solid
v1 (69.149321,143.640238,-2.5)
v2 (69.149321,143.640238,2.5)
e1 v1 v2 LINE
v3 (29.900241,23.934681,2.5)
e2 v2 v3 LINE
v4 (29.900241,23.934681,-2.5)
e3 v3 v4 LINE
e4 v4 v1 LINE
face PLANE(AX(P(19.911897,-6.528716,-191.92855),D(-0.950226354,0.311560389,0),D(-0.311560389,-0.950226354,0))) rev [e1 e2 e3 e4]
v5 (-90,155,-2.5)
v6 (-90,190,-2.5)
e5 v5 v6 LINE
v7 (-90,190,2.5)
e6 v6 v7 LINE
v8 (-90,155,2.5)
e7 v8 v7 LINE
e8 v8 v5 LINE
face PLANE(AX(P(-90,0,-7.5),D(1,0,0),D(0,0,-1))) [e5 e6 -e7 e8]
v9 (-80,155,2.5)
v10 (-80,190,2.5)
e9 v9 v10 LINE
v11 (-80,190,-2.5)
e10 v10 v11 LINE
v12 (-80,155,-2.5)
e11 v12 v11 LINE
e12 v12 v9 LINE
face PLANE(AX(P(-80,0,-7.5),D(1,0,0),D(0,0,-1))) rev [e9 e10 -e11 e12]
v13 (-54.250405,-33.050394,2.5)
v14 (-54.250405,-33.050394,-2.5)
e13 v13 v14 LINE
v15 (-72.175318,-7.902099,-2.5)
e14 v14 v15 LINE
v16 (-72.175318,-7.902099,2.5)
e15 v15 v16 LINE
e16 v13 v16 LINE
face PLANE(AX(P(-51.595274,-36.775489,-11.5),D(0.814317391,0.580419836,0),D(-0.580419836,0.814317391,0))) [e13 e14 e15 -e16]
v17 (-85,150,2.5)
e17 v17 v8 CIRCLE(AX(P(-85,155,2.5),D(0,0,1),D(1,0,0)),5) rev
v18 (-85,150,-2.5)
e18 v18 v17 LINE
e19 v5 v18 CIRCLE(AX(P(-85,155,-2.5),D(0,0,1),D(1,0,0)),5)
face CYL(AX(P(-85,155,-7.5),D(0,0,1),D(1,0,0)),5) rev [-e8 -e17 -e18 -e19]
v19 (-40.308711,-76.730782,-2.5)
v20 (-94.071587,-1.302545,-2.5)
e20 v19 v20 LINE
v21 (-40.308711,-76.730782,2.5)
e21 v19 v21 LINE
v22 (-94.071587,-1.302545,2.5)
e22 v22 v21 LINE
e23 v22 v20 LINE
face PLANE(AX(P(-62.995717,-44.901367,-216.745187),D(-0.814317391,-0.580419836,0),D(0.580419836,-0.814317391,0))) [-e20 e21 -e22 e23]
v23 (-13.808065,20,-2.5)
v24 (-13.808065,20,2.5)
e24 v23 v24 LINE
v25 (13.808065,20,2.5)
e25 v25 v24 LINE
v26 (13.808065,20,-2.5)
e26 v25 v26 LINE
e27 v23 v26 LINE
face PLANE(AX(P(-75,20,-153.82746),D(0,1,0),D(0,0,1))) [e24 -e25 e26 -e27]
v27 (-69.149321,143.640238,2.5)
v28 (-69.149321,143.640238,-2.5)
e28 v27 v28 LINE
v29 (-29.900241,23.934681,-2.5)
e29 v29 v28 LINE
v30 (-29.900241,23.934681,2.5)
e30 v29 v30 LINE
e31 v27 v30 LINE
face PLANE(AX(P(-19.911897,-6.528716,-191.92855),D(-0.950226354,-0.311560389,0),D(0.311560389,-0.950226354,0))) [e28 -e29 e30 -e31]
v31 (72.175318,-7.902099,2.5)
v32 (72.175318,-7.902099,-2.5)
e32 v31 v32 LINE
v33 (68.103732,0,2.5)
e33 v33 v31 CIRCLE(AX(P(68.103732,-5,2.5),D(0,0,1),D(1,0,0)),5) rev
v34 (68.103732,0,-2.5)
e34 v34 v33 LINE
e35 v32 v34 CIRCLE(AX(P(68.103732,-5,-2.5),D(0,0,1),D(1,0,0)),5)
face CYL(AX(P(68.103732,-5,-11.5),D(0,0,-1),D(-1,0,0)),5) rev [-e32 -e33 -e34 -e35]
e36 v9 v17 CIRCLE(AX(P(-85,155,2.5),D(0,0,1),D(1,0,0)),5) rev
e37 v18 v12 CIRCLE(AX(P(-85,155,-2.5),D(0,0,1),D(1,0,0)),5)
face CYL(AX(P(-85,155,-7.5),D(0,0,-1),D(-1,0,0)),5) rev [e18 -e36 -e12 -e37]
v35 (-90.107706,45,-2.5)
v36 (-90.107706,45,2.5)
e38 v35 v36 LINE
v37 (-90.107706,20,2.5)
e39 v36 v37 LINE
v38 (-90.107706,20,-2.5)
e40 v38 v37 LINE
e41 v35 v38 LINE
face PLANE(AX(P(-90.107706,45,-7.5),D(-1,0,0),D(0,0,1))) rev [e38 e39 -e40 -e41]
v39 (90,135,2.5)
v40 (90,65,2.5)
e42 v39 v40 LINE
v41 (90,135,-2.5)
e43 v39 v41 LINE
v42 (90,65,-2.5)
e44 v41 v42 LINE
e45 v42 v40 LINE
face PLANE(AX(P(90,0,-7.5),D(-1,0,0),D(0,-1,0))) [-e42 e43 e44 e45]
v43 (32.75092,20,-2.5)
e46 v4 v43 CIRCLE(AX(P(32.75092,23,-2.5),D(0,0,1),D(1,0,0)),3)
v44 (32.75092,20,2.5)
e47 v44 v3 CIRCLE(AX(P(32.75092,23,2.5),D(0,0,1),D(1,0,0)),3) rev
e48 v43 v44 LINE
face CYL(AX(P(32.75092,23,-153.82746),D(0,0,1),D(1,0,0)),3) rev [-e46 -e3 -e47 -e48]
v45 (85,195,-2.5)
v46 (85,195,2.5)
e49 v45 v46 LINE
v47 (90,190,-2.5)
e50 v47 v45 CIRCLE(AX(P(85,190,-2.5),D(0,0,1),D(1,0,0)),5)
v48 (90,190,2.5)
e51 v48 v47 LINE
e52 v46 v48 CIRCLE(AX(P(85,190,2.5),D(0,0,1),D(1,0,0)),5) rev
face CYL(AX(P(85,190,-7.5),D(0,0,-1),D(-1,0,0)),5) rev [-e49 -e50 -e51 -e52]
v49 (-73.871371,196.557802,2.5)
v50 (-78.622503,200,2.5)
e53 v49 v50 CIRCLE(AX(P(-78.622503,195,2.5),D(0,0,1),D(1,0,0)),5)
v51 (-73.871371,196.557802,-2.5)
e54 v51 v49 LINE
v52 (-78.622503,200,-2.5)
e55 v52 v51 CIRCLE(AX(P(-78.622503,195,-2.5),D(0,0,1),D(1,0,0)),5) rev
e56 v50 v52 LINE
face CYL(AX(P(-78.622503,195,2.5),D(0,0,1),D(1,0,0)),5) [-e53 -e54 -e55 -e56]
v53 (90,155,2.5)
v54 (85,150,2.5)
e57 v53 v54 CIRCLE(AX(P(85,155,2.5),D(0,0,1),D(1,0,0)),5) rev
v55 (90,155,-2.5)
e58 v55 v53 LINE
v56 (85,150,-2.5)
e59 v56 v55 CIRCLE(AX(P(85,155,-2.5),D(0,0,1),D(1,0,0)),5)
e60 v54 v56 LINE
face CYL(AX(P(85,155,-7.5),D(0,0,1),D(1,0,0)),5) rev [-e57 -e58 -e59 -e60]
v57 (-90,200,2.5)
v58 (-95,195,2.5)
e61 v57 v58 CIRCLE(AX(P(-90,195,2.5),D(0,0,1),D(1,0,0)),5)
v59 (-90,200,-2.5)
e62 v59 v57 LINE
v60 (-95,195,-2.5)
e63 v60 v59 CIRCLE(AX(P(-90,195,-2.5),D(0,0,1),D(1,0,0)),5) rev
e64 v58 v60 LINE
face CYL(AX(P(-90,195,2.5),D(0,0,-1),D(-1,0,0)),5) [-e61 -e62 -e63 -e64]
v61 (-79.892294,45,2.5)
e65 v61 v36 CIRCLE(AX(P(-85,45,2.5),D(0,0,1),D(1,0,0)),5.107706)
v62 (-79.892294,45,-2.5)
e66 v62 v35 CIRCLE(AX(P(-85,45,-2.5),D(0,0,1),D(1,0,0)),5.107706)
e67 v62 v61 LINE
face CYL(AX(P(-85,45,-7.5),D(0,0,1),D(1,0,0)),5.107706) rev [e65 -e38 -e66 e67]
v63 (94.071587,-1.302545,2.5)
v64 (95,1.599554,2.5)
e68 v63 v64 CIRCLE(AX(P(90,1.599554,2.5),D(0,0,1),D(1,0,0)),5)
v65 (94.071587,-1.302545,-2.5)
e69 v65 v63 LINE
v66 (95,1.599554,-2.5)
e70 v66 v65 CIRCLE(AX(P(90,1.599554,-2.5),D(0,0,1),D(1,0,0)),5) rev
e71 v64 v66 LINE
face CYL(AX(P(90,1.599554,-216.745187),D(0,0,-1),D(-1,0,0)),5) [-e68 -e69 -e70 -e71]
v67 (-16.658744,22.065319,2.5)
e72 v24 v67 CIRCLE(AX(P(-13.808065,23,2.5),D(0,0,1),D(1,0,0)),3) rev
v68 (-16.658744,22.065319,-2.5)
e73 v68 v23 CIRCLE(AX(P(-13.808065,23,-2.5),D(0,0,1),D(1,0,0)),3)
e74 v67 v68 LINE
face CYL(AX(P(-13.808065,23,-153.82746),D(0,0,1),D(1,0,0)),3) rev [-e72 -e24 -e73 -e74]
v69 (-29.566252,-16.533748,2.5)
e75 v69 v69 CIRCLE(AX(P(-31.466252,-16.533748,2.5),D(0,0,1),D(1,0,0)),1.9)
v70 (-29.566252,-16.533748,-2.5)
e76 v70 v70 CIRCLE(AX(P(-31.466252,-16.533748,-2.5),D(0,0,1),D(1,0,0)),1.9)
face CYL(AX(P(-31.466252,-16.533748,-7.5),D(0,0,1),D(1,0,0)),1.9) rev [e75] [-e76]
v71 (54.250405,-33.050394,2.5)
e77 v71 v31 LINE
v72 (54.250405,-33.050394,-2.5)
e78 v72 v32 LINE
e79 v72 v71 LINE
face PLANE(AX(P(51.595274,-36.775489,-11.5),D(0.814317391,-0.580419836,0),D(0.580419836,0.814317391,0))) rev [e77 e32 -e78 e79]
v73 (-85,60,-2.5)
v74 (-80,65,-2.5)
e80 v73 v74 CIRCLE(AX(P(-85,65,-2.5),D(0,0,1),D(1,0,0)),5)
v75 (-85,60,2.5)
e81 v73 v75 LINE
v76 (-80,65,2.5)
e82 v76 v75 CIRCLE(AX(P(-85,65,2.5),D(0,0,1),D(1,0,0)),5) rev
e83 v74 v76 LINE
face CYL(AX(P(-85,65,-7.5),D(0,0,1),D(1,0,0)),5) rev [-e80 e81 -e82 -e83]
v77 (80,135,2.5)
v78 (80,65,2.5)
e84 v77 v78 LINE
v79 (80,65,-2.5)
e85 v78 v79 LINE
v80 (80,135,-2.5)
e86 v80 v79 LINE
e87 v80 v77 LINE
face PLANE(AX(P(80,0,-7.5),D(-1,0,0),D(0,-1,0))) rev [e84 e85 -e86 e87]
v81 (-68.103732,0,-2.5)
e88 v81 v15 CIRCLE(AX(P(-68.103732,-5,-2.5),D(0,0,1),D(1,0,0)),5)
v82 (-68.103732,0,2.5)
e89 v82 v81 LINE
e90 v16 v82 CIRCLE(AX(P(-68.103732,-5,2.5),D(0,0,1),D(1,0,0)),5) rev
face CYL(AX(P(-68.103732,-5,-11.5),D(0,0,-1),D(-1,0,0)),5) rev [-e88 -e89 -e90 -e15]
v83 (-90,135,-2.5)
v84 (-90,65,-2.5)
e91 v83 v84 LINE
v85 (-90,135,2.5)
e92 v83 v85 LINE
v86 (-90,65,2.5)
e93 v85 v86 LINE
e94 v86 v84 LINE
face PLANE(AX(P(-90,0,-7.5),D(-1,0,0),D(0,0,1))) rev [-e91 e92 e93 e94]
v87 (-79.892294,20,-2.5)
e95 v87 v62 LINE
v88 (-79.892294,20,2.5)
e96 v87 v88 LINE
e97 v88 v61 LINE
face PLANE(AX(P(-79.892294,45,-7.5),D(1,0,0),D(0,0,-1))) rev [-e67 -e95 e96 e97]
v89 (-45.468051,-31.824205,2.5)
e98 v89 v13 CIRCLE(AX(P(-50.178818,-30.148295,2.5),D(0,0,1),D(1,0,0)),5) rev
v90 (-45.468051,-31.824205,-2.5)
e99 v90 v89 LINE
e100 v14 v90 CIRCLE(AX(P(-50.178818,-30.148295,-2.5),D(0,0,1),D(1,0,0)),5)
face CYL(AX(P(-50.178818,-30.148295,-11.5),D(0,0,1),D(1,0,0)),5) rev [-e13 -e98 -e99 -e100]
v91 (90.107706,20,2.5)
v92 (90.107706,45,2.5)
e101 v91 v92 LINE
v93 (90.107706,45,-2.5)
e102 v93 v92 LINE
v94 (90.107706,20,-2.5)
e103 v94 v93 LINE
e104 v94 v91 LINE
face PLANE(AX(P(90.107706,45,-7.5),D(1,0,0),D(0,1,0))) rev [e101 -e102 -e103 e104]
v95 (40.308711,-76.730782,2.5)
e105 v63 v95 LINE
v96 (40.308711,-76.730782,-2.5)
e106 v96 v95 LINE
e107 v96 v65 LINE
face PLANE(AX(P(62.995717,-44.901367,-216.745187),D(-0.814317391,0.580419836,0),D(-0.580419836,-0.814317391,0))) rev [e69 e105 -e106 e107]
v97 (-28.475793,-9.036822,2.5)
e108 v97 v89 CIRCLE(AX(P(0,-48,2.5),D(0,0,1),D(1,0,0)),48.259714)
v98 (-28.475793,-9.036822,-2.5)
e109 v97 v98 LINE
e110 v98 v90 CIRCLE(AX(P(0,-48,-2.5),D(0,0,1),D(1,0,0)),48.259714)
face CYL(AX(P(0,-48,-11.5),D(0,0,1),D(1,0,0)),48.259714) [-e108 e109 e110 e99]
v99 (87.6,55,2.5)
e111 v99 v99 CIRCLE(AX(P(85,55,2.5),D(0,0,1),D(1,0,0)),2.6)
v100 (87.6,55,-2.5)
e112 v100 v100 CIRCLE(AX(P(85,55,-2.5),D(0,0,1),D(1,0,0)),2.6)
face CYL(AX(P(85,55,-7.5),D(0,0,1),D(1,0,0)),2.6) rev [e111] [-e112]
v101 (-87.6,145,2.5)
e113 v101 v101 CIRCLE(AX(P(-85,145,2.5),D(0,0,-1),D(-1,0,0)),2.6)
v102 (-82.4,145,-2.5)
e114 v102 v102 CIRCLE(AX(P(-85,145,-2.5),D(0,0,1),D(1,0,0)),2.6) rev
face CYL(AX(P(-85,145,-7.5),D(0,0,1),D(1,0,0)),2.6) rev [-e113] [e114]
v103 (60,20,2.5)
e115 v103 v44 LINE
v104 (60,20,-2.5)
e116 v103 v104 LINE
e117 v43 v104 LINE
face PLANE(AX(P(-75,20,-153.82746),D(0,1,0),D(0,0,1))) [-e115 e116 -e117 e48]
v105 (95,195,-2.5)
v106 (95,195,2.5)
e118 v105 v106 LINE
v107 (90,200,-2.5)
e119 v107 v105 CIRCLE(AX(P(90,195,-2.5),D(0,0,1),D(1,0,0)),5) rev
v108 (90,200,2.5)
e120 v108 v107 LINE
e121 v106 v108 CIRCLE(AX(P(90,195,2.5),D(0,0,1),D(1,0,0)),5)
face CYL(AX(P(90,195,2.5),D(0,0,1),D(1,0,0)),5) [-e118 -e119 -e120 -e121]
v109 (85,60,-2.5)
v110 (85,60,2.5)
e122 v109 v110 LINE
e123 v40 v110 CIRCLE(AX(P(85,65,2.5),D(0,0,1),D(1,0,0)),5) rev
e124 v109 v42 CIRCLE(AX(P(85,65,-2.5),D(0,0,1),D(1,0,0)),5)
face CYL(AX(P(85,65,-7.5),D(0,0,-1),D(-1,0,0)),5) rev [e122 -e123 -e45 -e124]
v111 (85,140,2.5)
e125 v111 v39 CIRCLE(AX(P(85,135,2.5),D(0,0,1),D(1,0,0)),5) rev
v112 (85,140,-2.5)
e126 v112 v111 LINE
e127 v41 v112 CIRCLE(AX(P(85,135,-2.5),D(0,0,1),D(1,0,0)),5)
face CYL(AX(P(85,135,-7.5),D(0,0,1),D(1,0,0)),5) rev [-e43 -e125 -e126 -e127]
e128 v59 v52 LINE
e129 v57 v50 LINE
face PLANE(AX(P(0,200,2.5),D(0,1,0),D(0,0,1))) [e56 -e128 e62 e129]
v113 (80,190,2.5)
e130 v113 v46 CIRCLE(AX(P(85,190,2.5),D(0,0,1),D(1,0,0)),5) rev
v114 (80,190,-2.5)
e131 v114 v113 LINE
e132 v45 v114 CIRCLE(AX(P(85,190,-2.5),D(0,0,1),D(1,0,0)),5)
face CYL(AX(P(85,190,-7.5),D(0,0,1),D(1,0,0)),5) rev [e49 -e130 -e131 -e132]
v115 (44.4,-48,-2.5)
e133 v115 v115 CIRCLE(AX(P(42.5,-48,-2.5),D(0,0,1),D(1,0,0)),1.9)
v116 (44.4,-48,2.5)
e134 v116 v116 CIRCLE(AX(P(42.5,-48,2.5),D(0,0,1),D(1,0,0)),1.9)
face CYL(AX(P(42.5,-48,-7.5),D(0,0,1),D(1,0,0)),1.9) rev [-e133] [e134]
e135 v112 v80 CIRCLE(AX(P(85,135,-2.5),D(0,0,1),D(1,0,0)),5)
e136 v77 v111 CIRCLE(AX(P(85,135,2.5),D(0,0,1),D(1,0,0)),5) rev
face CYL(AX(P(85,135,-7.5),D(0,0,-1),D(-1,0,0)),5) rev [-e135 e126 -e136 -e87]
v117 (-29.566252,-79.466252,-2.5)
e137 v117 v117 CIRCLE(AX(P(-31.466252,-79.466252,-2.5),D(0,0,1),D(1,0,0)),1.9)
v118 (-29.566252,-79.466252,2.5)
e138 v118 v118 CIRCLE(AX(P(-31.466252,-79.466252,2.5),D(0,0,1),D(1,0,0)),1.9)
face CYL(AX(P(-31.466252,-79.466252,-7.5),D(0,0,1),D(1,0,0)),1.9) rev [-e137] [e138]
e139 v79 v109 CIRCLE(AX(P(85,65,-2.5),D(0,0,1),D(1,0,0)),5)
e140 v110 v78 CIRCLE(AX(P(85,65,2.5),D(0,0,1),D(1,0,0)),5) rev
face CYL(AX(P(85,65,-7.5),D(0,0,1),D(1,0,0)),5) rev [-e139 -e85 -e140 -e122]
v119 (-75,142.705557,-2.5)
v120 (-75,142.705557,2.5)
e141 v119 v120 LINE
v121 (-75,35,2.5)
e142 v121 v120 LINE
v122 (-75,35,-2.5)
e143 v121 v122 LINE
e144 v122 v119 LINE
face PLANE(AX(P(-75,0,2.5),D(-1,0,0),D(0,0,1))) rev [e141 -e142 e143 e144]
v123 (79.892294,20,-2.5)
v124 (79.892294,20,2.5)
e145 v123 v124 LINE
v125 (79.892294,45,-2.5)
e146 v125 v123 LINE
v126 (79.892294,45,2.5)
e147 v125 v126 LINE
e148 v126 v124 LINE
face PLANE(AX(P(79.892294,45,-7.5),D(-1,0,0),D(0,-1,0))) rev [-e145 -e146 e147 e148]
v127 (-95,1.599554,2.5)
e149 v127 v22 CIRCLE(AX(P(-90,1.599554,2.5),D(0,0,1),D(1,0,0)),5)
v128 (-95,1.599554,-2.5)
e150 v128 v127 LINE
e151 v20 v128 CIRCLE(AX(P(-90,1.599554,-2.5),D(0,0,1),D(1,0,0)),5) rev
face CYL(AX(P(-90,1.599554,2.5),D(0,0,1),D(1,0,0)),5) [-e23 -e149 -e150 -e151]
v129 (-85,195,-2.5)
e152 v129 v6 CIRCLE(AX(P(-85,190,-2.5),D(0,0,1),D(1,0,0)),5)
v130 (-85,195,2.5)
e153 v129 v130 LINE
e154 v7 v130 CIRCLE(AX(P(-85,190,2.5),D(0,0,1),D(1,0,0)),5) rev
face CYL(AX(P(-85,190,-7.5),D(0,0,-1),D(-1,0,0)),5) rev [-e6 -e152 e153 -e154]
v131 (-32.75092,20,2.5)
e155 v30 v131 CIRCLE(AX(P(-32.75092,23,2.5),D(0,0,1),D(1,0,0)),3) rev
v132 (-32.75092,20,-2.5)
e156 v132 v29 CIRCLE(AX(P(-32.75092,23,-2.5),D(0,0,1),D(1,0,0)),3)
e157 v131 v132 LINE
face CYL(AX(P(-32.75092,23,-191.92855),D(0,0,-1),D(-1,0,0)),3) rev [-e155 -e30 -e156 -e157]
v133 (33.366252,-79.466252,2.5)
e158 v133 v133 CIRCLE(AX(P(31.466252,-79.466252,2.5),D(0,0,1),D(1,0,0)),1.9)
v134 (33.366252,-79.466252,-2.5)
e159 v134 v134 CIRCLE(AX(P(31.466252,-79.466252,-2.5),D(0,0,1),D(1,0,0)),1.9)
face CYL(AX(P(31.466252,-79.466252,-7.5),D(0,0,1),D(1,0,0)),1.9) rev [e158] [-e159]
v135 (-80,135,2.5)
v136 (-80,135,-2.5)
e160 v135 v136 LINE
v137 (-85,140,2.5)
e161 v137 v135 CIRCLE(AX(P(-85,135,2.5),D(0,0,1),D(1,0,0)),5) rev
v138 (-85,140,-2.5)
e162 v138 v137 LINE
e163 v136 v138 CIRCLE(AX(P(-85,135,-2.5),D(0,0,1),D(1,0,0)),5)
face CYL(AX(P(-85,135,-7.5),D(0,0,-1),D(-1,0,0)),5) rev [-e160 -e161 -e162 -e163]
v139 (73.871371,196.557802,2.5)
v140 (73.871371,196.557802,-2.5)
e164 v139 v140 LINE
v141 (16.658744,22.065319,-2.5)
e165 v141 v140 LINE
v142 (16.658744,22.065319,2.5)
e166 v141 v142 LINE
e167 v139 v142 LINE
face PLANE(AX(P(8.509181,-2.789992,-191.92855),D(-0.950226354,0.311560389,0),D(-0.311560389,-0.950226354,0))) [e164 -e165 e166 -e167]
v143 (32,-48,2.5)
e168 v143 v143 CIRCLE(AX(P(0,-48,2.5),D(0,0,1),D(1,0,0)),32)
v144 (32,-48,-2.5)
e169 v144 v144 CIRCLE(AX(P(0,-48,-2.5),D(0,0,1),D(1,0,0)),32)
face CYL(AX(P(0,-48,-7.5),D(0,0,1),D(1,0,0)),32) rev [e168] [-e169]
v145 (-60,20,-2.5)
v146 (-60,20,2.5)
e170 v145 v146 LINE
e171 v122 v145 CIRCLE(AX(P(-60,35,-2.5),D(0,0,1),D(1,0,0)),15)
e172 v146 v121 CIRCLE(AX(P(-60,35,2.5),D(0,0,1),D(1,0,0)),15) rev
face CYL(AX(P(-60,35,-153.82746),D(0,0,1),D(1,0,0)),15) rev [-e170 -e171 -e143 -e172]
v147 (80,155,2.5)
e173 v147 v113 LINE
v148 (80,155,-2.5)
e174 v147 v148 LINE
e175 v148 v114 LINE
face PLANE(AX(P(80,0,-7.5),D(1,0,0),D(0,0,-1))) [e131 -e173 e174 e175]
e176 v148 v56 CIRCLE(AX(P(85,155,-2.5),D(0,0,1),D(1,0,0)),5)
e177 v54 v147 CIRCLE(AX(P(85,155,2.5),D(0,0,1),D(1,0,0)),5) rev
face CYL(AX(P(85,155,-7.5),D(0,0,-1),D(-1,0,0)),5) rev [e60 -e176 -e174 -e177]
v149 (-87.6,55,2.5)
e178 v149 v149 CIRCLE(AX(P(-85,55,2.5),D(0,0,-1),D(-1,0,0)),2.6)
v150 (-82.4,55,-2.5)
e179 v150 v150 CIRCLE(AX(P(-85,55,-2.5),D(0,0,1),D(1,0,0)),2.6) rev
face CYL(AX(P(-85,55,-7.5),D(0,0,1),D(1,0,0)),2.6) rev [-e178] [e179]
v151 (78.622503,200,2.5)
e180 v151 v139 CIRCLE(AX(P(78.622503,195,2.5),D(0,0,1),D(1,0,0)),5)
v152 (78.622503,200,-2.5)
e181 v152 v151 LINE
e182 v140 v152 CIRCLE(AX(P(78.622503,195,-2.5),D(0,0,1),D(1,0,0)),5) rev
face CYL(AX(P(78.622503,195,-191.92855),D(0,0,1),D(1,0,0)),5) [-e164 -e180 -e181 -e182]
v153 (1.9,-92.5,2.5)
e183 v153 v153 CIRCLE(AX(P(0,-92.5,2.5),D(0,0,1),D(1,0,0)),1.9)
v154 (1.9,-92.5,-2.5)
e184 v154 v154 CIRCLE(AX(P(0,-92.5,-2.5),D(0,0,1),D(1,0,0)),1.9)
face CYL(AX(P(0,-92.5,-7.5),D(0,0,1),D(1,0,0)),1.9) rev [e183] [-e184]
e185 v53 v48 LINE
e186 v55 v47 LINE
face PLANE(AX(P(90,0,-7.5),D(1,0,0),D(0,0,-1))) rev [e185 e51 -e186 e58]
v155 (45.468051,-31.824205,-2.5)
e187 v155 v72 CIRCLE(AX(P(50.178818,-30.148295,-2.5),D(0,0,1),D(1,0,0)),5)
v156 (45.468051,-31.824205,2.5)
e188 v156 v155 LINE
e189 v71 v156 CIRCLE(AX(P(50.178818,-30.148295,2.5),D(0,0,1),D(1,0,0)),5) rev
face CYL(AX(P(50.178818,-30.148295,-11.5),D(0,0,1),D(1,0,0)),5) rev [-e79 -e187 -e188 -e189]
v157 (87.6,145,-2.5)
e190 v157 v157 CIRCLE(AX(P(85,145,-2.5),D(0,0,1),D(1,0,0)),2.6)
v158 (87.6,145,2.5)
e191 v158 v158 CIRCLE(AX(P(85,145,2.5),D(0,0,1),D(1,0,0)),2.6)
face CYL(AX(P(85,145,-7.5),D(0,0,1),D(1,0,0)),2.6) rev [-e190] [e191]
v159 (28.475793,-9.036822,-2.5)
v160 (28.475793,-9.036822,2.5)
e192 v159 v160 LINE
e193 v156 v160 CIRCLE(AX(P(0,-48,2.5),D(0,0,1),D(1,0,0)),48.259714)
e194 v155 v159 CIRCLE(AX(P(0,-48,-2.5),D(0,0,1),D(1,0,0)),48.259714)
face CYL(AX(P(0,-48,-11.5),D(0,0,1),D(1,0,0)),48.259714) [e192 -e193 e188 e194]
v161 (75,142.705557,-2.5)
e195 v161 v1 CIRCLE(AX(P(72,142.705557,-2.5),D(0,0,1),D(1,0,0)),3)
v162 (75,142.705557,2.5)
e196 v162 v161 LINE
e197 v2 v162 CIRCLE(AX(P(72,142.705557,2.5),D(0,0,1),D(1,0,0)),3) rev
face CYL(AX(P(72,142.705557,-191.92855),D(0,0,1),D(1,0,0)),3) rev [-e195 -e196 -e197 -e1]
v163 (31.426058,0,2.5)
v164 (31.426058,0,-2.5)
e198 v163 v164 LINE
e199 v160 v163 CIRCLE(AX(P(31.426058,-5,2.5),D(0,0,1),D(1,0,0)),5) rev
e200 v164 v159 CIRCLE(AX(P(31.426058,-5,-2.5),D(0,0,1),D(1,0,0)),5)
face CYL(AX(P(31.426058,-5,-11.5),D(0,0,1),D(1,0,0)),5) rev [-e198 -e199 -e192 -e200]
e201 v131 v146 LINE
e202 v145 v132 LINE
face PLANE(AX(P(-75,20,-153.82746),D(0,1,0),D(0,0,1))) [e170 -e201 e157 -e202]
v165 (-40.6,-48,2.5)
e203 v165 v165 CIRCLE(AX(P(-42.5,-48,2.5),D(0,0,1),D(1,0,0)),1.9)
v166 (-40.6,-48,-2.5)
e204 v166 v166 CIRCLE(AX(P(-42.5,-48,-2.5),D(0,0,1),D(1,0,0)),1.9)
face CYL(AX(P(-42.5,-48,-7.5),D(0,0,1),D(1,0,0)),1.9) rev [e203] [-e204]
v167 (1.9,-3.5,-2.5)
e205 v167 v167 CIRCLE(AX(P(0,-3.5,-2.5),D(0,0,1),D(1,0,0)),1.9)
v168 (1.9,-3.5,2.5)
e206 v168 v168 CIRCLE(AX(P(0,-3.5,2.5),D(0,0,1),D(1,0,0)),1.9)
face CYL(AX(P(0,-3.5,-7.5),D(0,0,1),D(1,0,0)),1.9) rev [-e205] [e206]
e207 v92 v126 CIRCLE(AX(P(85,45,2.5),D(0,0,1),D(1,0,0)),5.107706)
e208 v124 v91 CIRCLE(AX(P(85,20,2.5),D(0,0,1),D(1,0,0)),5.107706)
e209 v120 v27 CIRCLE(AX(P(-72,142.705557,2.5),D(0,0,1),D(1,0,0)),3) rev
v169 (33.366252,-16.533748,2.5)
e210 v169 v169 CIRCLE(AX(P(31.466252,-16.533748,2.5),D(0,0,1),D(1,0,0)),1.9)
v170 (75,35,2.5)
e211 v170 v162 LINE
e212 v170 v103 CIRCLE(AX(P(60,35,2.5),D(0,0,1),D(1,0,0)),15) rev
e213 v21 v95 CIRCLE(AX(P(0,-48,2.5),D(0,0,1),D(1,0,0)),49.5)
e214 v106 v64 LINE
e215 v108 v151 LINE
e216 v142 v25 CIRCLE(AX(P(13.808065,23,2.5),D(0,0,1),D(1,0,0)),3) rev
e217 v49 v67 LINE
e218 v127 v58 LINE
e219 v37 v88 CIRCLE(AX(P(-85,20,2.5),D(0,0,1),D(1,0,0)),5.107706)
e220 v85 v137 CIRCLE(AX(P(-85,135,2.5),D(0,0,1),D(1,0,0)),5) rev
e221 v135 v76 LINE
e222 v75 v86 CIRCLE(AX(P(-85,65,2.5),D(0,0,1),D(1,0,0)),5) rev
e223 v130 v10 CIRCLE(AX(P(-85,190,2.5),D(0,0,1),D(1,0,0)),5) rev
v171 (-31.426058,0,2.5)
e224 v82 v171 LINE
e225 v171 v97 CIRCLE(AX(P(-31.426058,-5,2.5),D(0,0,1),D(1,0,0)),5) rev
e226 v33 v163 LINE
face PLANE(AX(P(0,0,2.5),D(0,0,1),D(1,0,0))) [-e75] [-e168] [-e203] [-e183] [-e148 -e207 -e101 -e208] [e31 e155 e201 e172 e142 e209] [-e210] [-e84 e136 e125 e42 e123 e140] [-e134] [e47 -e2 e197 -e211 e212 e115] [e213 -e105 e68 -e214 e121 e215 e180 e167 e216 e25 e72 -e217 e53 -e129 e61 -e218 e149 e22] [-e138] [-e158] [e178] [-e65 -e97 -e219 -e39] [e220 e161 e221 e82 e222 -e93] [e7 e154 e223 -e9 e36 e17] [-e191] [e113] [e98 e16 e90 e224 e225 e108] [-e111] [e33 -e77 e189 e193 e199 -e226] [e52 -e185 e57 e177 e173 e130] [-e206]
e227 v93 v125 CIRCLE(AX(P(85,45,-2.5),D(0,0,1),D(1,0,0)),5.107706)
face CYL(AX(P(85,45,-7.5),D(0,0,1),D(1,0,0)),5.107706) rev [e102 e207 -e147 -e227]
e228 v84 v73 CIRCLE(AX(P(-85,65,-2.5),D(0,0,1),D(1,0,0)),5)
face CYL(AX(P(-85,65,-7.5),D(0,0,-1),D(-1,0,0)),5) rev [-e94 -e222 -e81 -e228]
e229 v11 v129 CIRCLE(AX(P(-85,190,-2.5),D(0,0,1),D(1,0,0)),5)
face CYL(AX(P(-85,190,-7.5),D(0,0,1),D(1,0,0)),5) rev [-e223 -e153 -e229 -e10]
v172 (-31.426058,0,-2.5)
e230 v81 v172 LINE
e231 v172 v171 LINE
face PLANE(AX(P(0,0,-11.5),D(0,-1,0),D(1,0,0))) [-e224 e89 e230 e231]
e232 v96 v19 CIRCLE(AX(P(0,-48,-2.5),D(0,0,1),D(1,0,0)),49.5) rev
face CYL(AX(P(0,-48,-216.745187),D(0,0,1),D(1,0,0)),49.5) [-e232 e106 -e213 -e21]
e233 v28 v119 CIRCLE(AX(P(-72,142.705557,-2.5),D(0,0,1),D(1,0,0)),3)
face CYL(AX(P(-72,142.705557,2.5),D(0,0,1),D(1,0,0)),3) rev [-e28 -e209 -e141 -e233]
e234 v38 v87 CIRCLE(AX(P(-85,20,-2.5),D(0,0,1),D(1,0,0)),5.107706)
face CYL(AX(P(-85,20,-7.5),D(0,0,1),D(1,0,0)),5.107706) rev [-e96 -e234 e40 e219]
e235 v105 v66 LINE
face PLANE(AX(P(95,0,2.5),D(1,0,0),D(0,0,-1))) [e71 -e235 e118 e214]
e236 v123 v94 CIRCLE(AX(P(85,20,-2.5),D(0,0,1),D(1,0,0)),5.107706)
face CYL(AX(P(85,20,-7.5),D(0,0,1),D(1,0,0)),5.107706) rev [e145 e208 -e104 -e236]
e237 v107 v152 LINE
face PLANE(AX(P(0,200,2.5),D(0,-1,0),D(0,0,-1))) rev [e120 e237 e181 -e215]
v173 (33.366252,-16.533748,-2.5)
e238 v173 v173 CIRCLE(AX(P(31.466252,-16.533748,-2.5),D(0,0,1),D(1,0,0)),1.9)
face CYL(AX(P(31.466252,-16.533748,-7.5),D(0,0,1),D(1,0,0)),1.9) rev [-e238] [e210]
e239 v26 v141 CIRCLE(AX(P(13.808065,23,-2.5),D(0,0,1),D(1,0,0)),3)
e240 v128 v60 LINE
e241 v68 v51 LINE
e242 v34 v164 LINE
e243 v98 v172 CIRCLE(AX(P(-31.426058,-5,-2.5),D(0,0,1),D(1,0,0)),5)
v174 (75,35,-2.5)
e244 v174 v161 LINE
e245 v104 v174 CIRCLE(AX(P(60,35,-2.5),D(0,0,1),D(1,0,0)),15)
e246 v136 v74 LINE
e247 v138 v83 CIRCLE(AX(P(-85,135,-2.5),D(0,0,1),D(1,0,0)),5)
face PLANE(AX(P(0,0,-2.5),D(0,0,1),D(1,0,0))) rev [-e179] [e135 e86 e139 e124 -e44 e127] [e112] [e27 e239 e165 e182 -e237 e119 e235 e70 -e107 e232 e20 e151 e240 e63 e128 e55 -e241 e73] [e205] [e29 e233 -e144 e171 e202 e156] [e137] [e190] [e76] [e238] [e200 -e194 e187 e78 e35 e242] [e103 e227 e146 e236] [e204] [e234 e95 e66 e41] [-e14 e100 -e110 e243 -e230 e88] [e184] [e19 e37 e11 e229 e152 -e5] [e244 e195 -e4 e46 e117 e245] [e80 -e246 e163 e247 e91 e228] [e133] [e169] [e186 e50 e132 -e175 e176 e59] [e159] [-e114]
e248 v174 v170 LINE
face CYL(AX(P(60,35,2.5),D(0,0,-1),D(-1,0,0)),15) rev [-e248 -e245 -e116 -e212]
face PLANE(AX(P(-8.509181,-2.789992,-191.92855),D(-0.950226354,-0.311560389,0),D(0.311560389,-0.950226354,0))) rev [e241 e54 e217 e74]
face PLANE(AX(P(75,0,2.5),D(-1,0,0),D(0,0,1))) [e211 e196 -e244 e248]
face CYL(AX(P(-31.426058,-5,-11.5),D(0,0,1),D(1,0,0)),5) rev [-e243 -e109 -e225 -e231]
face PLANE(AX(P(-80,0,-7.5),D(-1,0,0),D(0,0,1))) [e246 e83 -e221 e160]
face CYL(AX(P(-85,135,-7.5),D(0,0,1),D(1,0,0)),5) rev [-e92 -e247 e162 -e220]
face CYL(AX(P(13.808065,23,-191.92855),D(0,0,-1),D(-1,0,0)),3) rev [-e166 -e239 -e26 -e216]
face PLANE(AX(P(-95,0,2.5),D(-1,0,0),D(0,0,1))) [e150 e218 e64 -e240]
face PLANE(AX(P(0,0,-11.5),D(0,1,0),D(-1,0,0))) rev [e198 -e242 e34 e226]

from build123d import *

# Parameters (mm, degrees)
SKETCH_1_W          = 20
SKETCH_1_H          = 200
SKETCH_1_R          = 28.5
EXTRUDE_1_DEPTH     = 2.5
CUT_EXTRUDE_2_DEPTH = 10
EXTRUDE_2_DEPTH     = 5
SKETCH_4_R          = 2.6
CUT_EXTRUDE_3_DEPTH = 10
SKETCH_5_W          = 150
SKETCH_5_H          = 20
EXTRUDE_3_DEPTH     = 5
FILLET_1_R          = 15
CUT_EXTRUDE_START   = -10
SKETCH_6_W          = 10
SKETCH_6_H          = 45
SKETCH_6_H_2        = 80
SKETCH_6_R          = 32
SKETCH_6_R_2        = 28.5
CUT_EXTRUDE_4_DEPTH = 10
CUT_EXTRUDE_5_DEPTH = 10
SKETCH_8_R          = 1.9
CUT_EXTRUDE_6_DEPTH = 10
EXTRUDE_4_DEPTH     = 5
FILLET_3_R          = 3
CUT_EXTRUDE_9_DEPTH = 14
FILLET_4_R          = 5
FILLET_5_R          = 5


with BuildPart() as part:
    # 草图1 → 凸台-拉伸1 (new, symmetric)
    # profile 1 of 3: a face of its own
    with BuildSketch(Plane.XY):
        with Locations((-85, 100)):
            Rectangle(SKETCH_1_W, SKETCH_1_H)
    # profile 2 of 3: a face of its own
    with BuildSketch(Plane.XY):
        Polygon((-75, 0), (-95, 0), (-95, -83), (95, -83), (95, 0), (75, 0), align=None)
        with Locations((0, -48)):
            Circle(SKETCH_1_R, mode=Mode.SUBTRACT)
    # profile 3 of 3: a face of its own
    with BuildSketch(Plane.XY):
        with Locations((85, 100)):
            Rectangle(SKETCH_1_W, SKETCH_1_H)
    extrude(amount=EXTRUDE_1_DEPTH, both=True)

    # 草图2 → 切除-拉伸2 (cut)
    with BuildSketch(Plane.XY.offset(2.5)):
        with BuildLine():
            Line((-25.660561099, -72.531318841), (-95, 0))
            Line((-95, 0), (-95, -83))
            Line((-95, -83), (-5.937171044, -83))
            ThreePointArc((-5.937171044, -83), (-16.643391795, -79.356777729), (-25.660561099, -72.531318841))
        make_face()
        with BuildLine():
            Line((95, 0), (25.660561099, -72.531318841))
            ThreePointArc((25.660561099, -72.531318841), (16.643391795, -79.356777729), (5.937171044, -83))
            Line((5.937171044, -83), (95, -83))
            Line((95, -83), (95, 0))
        make_face()
    extrude(amount=-CUT_EXTRUDE_2_DEPTH, mode=Mode.SUBTRACT)

    # 草图3 → 凸台-拉伸2 (add)
    with BuildSketch(Plane.XY.offset(2.5)):
        with BuildLine():
            Line((-95, 0), (-40.308710858, -76.730781907))
            ThreePointArc((-40.308710858, -76.730781907), (0, -97.5), (40.308710858, -76.730781907))
            Line((40.308710858, -76.730781907), (95, 0))
            Line((95, 0), (25.660561099, -72.531318841))
            ThreePointArc((25.660561099, -72.531318841), (16.643391795, -79.356777729), (5.937171044, -83))
            Line((5.937171044, -83), (-5.937171044, -83))
            ThreePointArc((-5.937171044, -83), (-16.643391795, -79.356777729), (-25.660561099, -72.531318841))
            Line((-25.660561099, -72.531318841), (-95, 0))
        make_face()
        with BuildLine():
            ThreePointArc((12.093386622, 0), (0, 1.5), (-12.093386622, 0))
            Line((-12.093386622, 0), (12.093386622, 0))
        make_face()
    extrude(amount=-EXTRUDE_2_DEPTH)

    # 草图4 → 切除-拉伸3 (cut)
    with BuildSketch(Plane.XY.offset(2.5)):
        with Locations((85, 145)):
            Circle(SKETCH_4_R)
        with Locations((85, 55)):
            Circle(SKETCH_4_R)
    cut_extrude_3 = extrude(amount=-CUT_EXTRUDE_3_DEPTH, mode=Mode.SUBTRACT)

    # 镜向1: 切除-拉伸3 across plane
    add(cut_extrude_3.mirror(Plane(origin=(0, 0, 0), x_dir=(0, 0, 1), z_dir=(1, 0, 0))), mode=Mode.SUBTRACT)

    # 草图5 → 凸台-拉伸3 (add)
    with BuildSketch(Plane.XY.offset(2.5)):
        with Locations((0, 10)):
            Rectangle(SKETCH_5_W, SKETCH_5_H)
    extrude(amount=-EXTRUDE_3_DEPTH)

    # 圆角1
    fillet_1_edges = [part.edges().sort_by_distance(p)[0] for p in [
        (-75, 20, 0),
        (75, 20, 0),
    ]]
    fillet(fillet_1_edges, radius=FILLET_1_R)

    # 草图6 → 切除-拉伸4 (cut)
    # profile 1 of 5: a face of its own
    with BuildSketch(Plane.XY.offset(2.5).offset(CUT_EXTRUDE_START)):
        with Locations((-85, 172.5)):
            Rectangle(SKETCH_6_W, SKETCH_6_H)
    # profile 2 of 5: a face of its own
    with BuildSketch(Plane.XY.offset(2.5).offset(CUT_EXTRUDE_START)):
        with Locations((-85, 100)):
            Rectangle(SKETCH_6_W, SKETCH_6_H_2)
    # profile 3 of 5: a face of its own
    with BuildSketch(Plane.XY.offset(2.5).offset(CUT_EXTRUDE_START)):
        with Locations((85, 100)):
            Rectangle(SKETCH_6_W, SKETCH_6_H_2)
    # profile 4 of 5: a face of its own
    with BuildSketch(Plane.XY.offset(2.5).offset(CUT_EXTRUDE_START)):
        with Locations((85, 172.5)):
            Rectangle(SKETCH_6_W, SKETCH_6_H)
    # profile 5 of 5: a face of its own
    with BuildSketch(Plane.XY.offset(2.5).offset(CUT_EXTRUDE_START)):
        with Locations((0, -48)):
            Circle(SKETCH_6_R)
        with Locations((0, -48)):
            Circle(SKETCH_6_R_2, mode=Mode.SUBTRACT)
    extrude(amount=CUT_EXTRUDE_4_DEPTH, mode=Mode.SUBTRACT)

    # 草图7 → 切除-拉伸5 (cut)
    with BuildSketch(Plane.XY.offset(2.5)):
        with BuildLine():
            Line((-79.89229429, 45), (-79.89229429, 20))
            ThreePointArc((-79.89229429, 20), (-85, 14.89229429), (-90.10770571, 20))
            Line((-90.10770571, 20), (-90.10770571, 45))
            ThreePointArc((-90.10770571, 45), (-85, 50.10770571), (-79.89229429, 45))
        make_face()
        with BuildLine():
            Line((90.10770571, 45), (90.10770571, 20))
            ThreePointArc((90.10770571, 20), (85, 14.89229429), (79.89229429, 20))
            Line((79.89229429, 20), (79.89229429, 45))
            ThreePointArc((79.89229429, 45), (85, 50.10770571), (90.10770571, 45))
        make_face()
    extrude(amount=-CUT_EXTRUDE_5_DEPTH, mode=Mode.SUBTRACT)

    # 草图8 → 切除-拉伸6 (cut)
    with BuildSketch(Plane.XY.offset(2.5)):
        with Locations((0, -3.5)):
            Circle(SKETCH_8_R)
        with Locations((31.466251763, -16.533748237)):
            Circle(SKETCH_8_R)
        with Locations((31.466251763, -79.466251763)):
            Circle(SKETCH_8_R)
        with Locations((0, -92.5)):
            Circle(SKETCH_8_R)
        with Locations((-31.466251763, -79.466251763)):
            Circle(SKETCH_8_R)
        with Locations((-31.466251763, -16.533748237)):
            Circle(SKETCH_8_R)
        with Locations((-42.5, -48)):
            Circle(SKETCH_8_R)
        with Locations((42.5, -48)):
            Circle(SKETCH_8_R)
    extrude(amount=-CUT_EXTRUDE_6_DEPTH, mode=Mode.SUBTRACT)

    # 草图9 → 凸台-拉伸4 (add)
    with BuildSketch(Plane.XY.offset(2.5)):
        Polygon((-15.981567349, 20), (-75, 200), (-75, 161.484192434), (-28.61013732, 20), align=None)
    extrude_4 = extrude(amount=-EXTRUDE_4_DEPTH)

    # 镜向2: 凸台-拉伸4 across plane
    add(extrude_4.mirror(Plane(origin=(0, 0, 0), x_dir=(0, 0, 1), z_dir=(1, 0, 0))))

    # 圆角3
    fillet_3_edges = [part.edges().sort_by_distance(p)[0] for p in [
        (-75, 161.484192434, 0),
        (-15.981567349, 20, 0),
        (-28.61013732, 20, 0),
        (75, 161.484192434, 0),
        (28.61013732, 20, 0),
        (15.981567349, 20, 0),
    ]]
    fillet(fillet_3_edges, radius=FILLET_3_R)

    # 草图11 → 切除-拉伸9 (cut)
    with BuildSketch(Plane.XY.offset(2.5)):
        with BuildLine():
            Line((-77.807686347, 0), (-47.883202974, -41.983450078))
            ThreePointArc((-47.883202974, -41.983450078), (-33.761084244, -13.515377475), (-5, 0))
            Line((-5, 0), (-77.807686347, 0))
        make_face()
        with BuildLine():
            Line((77.807686347, 0), (5, 0))
            ThreePointArc((5, 0), (33.761084244, -13.515377475), (47.883202974, -41.983450078))
            Line((47.883202974, -41.983450078), (77.807686347, 0))
        make_face()
    extrude(amount=-CUT_EXTRUDE_9_DEPTH, mode=Mode.SUBTRACT)

    # 圆角4
    fillet_4_edges = [part.edges().sort_by_distance(p)[0] for p in [
        (-47.883202974, -41.983450078, 0),
        (-5, 0, 0),
        (-80, 60, 0),
        (-90, 60, 0),
        (-90, 140, 0),
        (-80, 140, 0),
        (80, 150, 0),
        (80, 195, 0),
        (90, 195, 0),
        (90, 150, 0),
        (-90, 195, 0),
        (-80, 195, 0),
        (-80, 150, 0),
        (-90, 150, 0),
        (90, 60, 0),
        (80, 60, 0),
        (80, 140, 0),
        (90, 140, 0),
        (5, 0, 0),
        (77.807686347, 0, 0),
        (47.883202974, -41.983450078, 0),
        (-77.807686347, 0, 0),
    ]]
    fillet(fillet_4_edges, radius=FILLET_4_R - 0.0001)  # a hair under: the kernel refuses the full size

    # 圆角5
    fillet_5_edges = [part.edges().sort_by_distance(p)[0] for p in [
        (-95, 200, 0),
        (-75, 200, 0),
        (75, 200, 0),
        (95, 200, 0),
        (-95, 0, 0),
        (95, 0, 0),
    ]]
    fillet(fillet_5_edges, radius=FILLET_5_R)


solid = part.part
